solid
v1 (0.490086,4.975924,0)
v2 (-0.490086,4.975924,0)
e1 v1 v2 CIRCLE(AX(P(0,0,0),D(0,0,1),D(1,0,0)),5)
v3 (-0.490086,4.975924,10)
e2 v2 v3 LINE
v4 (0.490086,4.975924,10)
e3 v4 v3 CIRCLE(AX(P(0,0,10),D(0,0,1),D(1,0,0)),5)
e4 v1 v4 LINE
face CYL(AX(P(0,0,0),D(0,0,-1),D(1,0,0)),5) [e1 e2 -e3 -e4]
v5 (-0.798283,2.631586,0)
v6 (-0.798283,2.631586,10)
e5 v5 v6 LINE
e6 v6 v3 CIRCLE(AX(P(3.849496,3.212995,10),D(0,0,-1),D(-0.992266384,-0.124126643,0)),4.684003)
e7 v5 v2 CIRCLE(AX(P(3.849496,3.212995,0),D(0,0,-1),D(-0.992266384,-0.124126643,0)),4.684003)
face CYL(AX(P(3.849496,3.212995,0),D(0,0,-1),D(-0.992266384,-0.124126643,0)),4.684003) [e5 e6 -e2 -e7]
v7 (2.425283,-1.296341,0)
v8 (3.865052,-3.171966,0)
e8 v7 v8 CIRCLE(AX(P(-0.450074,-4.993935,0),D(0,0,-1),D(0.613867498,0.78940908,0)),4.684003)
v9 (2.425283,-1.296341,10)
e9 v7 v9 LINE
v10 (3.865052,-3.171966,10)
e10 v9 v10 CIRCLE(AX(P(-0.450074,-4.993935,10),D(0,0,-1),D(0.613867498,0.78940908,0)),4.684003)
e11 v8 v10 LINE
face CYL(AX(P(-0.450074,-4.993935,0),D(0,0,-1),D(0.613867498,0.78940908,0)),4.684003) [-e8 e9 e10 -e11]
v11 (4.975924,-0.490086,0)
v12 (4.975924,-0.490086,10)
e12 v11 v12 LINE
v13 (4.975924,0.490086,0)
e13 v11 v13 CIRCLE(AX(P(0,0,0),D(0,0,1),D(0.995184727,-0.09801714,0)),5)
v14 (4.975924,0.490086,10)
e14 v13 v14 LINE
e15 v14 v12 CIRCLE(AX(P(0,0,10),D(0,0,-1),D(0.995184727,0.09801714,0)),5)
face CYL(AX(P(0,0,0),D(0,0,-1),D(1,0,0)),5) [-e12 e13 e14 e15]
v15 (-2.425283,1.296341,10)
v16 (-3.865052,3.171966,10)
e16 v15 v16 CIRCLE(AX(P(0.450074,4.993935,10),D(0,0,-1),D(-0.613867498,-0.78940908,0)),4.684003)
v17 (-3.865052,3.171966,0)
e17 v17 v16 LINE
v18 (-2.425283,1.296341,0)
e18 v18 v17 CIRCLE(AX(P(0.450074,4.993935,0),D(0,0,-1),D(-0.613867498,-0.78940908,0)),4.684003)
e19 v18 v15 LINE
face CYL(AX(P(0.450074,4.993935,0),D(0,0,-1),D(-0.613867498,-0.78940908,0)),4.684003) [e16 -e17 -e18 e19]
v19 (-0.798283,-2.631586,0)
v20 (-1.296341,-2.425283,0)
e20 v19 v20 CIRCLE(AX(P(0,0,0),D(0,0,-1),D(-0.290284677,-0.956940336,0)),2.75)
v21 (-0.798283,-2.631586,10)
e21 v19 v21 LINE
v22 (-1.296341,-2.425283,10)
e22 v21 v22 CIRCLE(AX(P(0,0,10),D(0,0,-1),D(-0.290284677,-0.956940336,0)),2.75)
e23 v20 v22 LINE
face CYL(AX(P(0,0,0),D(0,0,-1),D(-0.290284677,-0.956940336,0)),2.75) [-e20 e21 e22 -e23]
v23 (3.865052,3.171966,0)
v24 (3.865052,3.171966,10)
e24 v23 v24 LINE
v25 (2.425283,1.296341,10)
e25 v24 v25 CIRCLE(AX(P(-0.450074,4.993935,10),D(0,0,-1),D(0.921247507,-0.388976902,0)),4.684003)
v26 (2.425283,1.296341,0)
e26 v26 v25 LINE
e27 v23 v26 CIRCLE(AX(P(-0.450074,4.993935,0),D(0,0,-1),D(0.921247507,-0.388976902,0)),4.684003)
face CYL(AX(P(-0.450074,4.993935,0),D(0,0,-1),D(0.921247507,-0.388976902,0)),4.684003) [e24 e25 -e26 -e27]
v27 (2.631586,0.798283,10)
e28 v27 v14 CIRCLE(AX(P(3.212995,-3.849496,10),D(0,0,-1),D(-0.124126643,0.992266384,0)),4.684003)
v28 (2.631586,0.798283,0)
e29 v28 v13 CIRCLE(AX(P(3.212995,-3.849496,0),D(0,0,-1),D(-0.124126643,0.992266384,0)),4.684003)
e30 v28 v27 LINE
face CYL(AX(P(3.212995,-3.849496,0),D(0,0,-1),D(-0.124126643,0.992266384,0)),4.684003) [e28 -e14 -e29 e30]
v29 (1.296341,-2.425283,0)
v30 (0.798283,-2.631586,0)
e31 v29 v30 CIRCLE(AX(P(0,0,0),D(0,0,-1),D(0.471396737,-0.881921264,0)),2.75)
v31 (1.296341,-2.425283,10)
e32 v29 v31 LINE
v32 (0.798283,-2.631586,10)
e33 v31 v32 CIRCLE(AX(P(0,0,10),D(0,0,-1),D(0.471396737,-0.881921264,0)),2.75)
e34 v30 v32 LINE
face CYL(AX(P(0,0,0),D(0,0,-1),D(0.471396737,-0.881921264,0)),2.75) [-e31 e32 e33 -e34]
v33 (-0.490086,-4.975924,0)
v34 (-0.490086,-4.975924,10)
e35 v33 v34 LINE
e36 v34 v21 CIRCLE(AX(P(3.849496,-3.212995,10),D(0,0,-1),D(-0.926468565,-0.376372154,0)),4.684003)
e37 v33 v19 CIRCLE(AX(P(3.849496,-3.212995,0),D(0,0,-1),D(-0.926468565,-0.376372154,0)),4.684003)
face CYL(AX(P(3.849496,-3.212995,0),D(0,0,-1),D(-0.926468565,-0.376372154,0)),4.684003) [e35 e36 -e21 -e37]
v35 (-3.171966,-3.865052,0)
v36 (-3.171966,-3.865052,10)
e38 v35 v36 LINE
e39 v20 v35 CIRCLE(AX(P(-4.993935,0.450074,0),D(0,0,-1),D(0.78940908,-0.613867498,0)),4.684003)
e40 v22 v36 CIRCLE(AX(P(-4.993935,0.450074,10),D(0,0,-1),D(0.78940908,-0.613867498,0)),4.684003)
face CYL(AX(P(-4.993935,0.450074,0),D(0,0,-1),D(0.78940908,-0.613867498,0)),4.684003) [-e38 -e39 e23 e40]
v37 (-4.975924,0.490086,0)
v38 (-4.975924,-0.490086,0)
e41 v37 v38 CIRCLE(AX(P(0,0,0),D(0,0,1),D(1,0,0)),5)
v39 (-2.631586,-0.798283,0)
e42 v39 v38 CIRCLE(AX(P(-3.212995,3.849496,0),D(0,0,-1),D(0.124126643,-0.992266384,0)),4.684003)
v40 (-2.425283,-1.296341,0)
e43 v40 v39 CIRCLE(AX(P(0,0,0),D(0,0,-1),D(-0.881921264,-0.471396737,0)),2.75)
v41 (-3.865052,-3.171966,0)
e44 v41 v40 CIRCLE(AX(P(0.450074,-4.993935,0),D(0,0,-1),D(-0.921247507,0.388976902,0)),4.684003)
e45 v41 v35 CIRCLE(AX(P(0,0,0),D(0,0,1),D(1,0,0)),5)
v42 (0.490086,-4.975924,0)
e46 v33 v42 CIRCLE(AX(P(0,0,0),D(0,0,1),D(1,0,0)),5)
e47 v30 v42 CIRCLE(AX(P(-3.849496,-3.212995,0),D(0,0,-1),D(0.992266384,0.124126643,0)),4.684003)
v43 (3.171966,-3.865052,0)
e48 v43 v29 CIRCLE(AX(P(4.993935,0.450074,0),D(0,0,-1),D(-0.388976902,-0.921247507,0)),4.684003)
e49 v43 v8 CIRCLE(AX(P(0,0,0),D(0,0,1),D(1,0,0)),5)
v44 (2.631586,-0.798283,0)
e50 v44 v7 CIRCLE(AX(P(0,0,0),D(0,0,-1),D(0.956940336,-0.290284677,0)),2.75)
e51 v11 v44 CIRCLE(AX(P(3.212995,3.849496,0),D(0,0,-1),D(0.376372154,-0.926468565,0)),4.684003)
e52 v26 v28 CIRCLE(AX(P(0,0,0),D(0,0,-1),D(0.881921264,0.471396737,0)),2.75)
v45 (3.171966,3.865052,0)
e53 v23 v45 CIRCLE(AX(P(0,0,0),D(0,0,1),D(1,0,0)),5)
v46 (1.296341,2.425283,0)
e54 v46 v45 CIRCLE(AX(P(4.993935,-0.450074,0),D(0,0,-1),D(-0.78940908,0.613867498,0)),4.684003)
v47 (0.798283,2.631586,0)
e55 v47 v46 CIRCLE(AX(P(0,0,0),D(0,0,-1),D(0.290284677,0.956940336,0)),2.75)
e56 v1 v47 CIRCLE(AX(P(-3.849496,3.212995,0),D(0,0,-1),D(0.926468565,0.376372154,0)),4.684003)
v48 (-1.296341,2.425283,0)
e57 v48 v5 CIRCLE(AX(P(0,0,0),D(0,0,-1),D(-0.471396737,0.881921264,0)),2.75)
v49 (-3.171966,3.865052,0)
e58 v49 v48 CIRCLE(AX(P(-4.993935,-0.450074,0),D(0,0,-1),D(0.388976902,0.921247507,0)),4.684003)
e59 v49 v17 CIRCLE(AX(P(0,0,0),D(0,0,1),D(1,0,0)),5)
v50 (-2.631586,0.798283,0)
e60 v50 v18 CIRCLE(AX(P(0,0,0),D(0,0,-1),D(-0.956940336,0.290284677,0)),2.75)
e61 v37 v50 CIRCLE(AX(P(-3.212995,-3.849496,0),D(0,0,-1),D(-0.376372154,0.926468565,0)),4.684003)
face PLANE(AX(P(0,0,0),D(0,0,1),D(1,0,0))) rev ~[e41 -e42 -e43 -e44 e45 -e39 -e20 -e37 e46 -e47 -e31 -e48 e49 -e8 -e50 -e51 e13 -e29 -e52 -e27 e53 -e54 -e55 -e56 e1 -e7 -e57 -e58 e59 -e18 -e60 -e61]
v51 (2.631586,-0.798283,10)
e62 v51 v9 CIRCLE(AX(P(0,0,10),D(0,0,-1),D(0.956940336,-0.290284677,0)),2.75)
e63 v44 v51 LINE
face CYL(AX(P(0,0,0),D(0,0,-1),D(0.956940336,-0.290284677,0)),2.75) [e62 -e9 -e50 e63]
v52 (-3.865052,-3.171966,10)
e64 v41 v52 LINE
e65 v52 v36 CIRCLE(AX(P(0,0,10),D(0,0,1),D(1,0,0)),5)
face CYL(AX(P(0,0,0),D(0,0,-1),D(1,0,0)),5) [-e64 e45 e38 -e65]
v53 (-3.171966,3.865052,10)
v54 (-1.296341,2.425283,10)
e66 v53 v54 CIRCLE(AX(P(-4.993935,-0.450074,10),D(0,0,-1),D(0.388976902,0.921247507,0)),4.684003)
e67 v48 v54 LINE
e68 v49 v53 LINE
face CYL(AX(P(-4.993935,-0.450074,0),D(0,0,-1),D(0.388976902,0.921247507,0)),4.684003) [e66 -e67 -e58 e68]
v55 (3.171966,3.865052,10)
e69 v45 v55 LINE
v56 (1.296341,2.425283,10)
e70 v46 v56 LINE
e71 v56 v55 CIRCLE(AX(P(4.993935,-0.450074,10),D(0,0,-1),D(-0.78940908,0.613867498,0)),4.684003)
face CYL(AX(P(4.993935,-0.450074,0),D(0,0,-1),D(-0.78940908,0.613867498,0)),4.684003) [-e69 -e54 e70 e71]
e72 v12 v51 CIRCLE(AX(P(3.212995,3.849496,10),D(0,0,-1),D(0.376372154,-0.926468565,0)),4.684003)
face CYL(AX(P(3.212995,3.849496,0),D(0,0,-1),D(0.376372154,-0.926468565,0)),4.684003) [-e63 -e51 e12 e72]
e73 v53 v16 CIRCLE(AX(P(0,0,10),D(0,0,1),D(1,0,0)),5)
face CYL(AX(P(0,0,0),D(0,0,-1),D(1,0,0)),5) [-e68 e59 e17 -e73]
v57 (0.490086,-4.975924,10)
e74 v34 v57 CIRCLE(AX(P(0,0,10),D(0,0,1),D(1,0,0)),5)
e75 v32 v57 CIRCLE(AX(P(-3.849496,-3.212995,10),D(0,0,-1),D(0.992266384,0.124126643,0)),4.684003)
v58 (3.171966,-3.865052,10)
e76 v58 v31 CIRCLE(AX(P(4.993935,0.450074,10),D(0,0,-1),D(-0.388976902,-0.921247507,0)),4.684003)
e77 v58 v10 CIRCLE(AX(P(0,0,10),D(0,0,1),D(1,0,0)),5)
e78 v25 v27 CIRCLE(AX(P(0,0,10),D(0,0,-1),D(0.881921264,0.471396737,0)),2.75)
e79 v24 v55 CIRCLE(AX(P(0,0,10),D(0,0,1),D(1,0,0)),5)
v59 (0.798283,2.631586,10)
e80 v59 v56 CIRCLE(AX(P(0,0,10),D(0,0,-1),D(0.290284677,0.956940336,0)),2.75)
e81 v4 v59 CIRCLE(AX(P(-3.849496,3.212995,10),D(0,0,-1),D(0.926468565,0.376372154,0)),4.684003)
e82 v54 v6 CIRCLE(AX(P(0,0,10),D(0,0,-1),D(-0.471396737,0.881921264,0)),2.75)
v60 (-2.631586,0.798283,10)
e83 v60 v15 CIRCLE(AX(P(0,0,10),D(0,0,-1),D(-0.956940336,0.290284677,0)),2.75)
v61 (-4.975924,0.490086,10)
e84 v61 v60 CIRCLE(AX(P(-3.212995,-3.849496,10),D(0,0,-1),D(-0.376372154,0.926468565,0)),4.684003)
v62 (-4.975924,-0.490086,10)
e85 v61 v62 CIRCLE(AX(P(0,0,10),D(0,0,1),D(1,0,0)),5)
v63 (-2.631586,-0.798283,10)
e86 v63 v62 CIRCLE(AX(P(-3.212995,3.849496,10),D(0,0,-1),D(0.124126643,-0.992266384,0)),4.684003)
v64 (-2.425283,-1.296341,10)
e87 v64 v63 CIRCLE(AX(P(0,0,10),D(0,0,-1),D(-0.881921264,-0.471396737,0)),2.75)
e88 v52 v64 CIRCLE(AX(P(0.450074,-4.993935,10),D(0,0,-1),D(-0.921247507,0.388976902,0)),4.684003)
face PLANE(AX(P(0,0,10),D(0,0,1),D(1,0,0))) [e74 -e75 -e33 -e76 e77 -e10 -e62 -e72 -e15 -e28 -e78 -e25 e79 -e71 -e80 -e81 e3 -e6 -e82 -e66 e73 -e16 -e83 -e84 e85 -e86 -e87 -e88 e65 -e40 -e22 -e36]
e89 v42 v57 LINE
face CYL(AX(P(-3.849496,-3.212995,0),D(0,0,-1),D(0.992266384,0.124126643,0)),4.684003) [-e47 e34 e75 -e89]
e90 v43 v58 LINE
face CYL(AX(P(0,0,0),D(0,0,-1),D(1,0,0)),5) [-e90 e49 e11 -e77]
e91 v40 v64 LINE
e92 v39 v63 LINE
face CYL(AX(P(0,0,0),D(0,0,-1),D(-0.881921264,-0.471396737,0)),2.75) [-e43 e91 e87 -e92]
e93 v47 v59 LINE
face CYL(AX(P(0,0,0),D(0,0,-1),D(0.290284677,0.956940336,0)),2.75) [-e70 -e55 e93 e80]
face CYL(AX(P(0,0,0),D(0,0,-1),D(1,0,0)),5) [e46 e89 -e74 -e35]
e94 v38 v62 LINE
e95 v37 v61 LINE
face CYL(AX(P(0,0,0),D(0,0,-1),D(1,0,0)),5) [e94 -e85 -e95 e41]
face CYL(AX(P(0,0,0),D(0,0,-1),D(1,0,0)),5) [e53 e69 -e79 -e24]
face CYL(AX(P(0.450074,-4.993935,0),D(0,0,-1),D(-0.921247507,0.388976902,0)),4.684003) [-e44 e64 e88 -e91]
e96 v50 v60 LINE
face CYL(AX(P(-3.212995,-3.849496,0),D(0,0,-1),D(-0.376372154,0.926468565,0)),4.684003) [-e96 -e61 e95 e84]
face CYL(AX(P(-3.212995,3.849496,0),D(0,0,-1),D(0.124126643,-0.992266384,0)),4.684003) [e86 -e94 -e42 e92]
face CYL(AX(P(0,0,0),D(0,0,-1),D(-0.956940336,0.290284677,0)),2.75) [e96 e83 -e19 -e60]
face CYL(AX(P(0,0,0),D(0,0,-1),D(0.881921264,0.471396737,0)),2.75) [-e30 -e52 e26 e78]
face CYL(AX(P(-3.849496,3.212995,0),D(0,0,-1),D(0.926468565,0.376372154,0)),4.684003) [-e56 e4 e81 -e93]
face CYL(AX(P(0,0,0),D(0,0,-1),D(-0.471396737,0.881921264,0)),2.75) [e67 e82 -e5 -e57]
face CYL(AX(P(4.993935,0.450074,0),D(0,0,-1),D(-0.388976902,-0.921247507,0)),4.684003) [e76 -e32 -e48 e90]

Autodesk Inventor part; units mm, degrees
sketch "Sketch1" plane through (0, 0, 0) normal (0, 0, 1) x (1, 0, 0)
  circle A0 centre (0, 0) radius 5
  dimension "d0" = 10
extrude "Extrusion1" add sketch "Sketch1" along normal blind 10
ref_plane "Work Plane2" through (0, 0, 5) normal (0, 0, 1) x (1, 0, 0)
sketch "Sketch2" plane through (0, 0, 0) normal (0, 0, -1) x (-1, 0, 0)
  circle A0 centre (0, 0) radius 5 projected
  circle A1 centre (0, 0) radius 4
  dimension "d3" = 8
surface extrude "Pitch Diameter" sketch "Sketch2" against normal through all shown no curves A1
ref_plane "Work Plane8" through (0, 0, 0) normal (0.9238795, 0.3826834, 0) x (0, 0, 1)
ref_plane "Work Plane9" through (0, 0, 0) normal (1, 0, 0) x (0, 1, 0)
spur gear teeth "Spur Gear" teeth 8 pitch diameter 8 tip diameter 10 root diameter 5.5 face width 10 start plane through (0, 0, 0) normal (0, 0, -1) x (-1, 0, 0)
equation "\"d0\" = da_da"
equation "\"d1\" = da_b"
equation "\"d3\" = da_d"
equation "\"d16\" = da_aw"
equation "\"d43\" = da_aw"
equation "\"d46\" = da_aw"
equation "\"da_da\" = 10"
equation "\"da_b\" = 10"
equation "\"da_d\" = 8"
equation "\"da_aw\" = 14"
properties part number "Spur Gear1" material "Steel"
